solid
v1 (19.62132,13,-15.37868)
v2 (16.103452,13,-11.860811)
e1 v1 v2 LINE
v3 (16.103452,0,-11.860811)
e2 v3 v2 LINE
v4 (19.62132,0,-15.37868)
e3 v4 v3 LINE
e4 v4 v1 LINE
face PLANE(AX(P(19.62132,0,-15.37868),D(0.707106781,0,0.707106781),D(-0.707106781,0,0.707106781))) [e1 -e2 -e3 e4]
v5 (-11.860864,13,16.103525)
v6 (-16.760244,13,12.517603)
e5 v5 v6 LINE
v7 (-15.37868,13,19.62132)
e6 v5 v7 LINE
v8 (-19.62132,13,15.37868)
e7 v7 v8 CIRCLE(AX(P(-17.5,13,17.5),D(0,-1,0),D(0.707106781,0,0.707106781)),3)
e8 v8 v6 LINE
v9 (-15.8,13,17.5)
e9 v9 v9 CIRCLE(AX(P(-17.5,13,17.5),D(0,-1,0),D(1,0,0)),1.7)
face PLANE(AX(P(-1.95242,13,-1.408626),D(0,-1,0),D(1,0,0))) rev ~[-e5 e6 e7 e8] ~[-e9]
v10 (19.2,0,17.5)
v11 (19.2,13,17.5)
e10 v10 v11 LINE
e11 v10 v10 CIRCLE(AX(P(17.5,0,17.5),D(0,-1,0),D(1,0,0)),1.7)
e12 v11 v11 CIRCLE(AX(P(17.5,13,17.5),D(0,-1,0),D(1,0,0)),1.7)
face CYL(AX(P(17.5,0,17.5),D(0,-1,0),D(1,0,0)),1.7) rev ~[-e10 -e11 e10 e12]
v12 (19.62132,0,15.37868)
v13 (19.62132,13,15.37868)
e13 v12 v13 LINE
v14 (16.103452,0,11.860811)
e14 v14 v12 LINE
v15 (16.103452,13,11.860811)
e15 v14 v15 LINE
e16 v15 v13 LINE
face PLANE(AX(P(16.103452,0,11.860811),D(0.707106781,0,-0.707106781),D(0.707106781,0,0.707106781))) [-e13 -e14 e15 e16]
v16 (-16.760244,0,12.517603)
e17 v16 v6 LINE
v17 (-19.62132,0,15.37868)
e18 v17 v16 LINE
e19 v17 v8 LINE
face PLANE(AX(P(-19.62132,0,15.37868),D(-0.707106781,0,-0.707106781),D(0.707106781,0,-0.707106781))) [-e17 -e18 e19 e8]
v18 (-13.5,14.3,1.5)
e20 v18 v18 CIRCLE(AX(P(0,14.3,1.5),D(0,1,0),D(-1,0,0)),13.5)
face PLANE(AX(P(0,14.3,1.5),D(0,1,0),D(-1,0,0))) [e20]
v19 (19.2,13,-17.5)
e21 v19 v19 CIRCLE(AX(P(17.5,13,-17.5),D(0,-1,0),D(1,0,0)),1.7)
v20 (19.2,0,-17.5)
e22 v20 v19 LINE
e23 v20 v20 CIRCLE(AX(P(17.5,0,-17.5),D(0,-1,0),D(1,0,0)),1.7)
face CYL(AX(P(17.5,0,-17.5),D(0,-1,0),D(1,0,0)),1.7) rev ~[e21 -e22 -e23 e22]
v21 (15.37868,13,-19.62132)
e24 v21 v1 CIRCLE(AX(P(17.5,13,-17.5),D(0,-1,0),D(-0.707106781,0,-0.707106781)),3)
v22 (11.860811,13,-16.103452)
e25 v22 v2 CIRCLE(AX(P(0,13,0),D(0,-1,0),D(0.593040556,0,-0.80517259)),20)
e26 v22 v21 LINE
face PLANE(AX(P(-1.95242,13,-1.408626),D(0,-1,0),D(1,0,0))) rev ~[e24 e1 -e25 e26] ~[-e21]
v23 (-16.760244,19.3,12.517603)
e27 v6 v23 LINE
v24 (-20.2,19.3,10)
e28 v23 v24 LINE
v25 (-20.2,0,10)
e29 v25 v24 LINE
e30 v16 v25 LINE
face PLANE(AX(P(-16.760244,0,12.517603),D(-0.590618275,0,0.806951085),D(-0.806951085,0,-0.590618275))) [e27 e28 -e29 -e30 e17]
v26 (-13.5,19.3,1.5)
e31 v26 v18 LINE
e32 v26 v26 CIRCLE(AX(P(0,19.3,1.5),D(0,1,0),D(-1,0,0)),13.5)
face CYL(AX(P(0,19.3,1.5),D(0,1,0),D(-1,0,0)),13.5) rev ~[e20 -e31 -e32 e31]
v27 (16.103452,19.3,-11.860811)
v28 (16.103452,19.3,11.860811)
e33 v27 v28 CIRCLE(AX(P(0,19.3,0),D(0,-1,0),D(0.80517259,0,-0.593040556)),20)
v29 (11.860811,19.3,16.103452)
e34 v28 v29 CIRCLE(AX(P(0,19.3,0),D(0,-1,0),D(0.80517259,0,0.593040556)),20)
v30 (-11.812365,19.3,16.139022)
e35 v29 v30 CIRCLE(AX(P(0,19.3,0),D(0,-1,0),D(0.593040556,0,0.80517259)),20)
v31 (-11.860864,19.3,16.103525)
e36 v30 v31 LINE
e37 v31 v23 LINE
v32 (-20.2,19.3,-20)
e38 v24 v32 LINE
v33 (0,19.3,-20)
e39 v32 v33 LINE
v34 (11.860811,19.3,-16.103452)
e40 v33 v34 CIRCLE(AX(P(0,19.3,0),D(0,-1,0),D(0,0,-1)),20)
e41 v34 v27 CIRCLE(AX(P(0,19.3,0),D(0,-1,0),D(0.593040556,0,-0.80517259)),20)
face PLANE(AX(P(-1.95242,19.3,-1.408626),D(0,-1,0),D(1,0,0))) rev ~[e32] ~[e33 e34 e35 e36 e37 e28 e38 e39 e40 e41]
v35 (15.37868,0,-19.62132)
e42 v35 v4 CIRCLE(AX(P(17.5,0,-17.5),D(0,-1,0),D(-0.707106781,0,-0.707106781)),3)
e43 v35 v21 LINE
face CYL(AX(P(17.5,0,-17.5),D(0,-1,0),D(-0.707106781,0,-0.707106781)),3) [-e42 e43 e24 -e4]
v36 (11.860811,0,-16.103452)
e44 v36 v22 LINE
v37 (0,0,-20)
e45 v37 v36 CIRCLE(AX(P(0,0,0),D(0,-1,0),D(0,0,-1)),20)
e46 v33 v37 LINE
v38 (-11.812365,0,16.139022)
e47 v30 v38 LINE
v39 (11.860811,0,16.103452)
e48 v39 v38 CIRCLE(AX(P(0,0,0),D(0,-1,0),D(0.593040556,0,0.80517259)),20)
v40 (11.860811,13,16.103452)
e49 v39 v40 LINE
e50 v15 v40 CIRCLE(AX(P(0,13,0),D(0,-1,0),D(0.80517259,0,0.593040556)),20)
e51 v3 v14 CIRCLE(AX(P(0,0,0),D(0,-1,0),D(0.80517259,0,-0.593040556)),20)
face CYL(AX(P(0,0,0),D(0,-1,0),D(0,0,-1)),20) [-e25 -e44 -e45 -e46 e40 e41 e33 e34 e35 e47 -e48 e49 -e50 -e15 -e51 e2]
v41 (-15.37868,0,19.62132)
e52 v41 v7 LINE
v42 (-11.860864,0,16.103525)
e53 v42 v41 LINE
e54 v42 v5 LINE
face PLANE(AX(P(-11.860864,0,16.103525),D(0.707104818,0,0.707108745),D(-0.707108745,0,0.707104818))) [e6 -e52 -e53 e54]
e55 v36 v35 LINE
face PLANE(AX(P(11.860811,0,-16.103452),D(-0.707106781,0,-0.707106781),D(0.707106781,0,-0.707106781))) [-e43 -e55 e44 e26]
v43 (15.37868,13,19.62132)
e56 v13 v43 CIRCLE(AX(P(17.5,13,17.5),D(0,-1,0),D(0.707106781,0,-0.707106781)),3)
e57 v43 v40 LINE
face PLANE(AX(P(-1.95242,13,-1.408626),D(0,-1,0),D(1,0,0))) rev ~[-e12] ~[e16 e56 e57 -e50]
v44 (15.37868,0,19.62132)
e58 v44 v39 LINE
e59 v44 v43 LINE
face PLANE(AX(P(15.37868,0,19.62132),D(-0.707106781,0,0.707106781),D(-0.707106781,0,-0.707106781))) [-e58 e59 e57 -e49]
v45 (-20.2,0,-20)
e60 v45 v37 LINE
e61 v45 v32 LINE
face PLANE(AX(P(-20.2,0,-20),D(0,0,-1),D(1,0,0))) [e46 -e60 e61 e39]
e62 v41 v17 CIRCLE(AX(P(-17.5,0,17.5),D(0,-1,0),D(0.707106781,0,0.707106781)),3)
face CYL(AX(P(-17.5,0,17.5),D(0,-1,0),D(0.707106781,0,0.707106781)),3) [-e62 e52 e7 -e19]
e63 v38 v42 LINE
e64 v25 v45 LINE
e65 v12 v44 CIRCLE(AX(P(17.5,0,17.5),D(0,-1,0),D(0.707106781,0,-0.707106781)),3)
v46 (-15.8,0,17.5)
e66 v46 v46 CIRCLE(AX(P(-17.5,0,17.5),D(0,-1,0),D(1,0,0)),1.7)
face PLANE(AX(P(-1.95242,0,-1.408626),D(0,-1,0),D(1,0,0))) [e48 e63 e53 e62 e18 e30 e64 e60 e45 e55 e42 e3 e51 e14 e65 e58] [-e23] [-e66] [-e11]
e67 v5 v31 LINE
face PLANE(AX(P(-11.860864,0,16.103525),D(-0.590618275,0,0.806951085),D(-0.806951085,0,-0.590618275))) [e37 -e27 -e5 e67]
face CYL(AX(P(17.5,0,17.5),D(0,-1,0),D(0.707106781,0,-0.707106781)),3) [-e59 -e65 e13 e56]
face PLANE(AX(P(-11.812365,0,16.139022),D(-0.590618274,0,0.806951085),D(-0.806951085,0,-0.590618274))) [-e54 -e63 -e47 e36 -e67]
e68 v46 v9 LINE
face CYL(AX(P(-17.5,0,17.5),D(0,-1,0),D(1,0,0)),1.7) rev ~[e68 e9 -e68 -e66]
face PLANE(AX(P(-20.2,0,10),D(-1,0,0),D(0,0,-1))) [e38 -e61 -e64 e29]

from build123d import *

# Parameters (mm, degrees)
F0_R     = 1.7
F1_DEPTH = 13
F2_DEPTH = 19.3
F3_R     = 13.5
F4_DEPTH = 5


# Not quite as in the source:
# - ends of sketch curves that miss each other by under 0.0002 mm in the source are joined


with BuildPart() as f1:
    # F0 (on Front) → F1 (new body)
    with BuildSketch(Plane.XZ):
        with BuildLine():
            Line((-20.2, -20), (0, -20))
            ThreePointArc((0, -20), (6.2422337367, -19.0009083461), (11.8608111105, -16.1034517977))
            ThreePointArc((11.8608111105, -16.1034517977), (14.1421356237, -14.1421356237), (16.1034517977, -11.8608111105))
            ThreePointArc((16.1034517977, -11.8608111105), (20, 0), (16.1034517977, 11.8608111105))
            ThreePointArc((16.1034517977, 11.8608111105), (14.1421356237, 14.1421356237), (11.8608111105, 16.1034517977))
            ThreePointArc((11.8608111105, 16.1034517977), (0.0300507716, 19.9999774238), (-11.8123654956, 16.1390216989))
            Line((-11.8123654956, 16.1390216989), (-11.8608644463, 16.1035246693))
            Line((-11.8608644463, 16.1035246693), (-16.7602440212, 12.517603334))
            Line((-16.7602440212, 12.517603334), (-20.2, 10))
            Line((-20.2, 10), (-20.2, -20))
        make_face()
        with BuildLine():
            ThreePointArc((16.1034517977, -11.8608111105), (14.1421356237, -14.1421356237), (11.8608111105, -16.1034517977))
            Line((11.8608111105, -16.1034517977), (15.3786796564, -19.6213203436))
            ThreePointArc((15.3786796564, -19.6213203436), (19.6213203436, -19.6213203436), (19.6213203436, -15.3786796564))
            Line((19.6213203436, -15.3786796564), (16.1034517977, -11.8608111105))
        make_face()
        with Locations((17.5, -17.5)):
            Circle(F0_R, mode=Mode.SUBTRACT)
        with BuildLine():
            ThreePointArc((11.8608111105, 16.1034517977), (14.1421356237, 14.1421356237), (16.1034517977, 11.8608111105))
            Line((16.1034517977, 11.8608111105), (19.6213203436, 15.3786796564))
            ThreePointArc((19.6213203436, 15.3786796564), (19.6213203436, 19.6213203436), (15.3786796564, 19.6213203436))
            Line((15.3786796564, 19.6213203436), (11.8608111105, 16.1034517977))
        make_face()
        with Locations((17.5, 17.5)):
            Circle(F0_R, mode=Mode.SUBTRACT)
        with BuildLine():
            Line((-19.6213203436, 15.3786796564), (-16.7602440212, 12.517603334))
            Line((-16.7602440212, 12.517603334), (-11.8608644463, 16.1035246693))
            Line((-11.8608644463, 16.1035246693), (-15.3786796564, 19.6213203436))
            ThreePointArc((-15.3786796564, 19.6213203436), (-19.6213203436, 19.6213203436), (-19.6213203436, 15.3786796564))
        make_face()
        with Locations((-17.5, 17.5)):
            Circle(F0_R, mode=Mode.SUBTRACT)
    extrude(amount=-F1_DEPTH)

    # F0 (on Front) → F2 (join)
    with BuildSketch(Plane.XZ):
        with BuildLine():
            Line((-20.2, -20), (0, -20))
            ThreePointArc((0, -20), (6.2422337367, -19.0009083461), (11.8608111105, -16.1034517977))
            ThreePointArc((11.8608111105, -16.1034517977), (14.1421356237, -14.1421356237), (16.1034517977, -11.8608111105))
            ThreePointArc((16.1034517977, -11.8608111105), (20, 0), (16.1034517977, 11.8608111105))
            ThreePointArc((16.1034517977, 11.8608111105), (14.1421356237, 14.1421356237), (11.8608111105, 16.1034517977))
            ThreePointArc((11.8608111105, 16.1034517977), (0.0300507716, 19.9999774238), (-11.8123654956, 16.1390216989))
            Line((-11.8123654956, 16.1390216989), (-11.8608644463, 16.1035246693))
            Line((-11.8608644463, 16.1035246693), (-16.7602440212, 12.517603334))
            Line((-16.7602440212, 12.517603334), (-20.2, 10))
            Line((-20.2, 10), (-20.2, -20))
        make_face()
    extrude(amount=-F2_DEPTH)

    # F3 (on face) → F4 (cut)
    with BuildSketch(Plane(origin=(0, 19.3, 0), x_dir=(-1, 0, 0), z_dir=(0, 1, 0))):
        with Locations((0, 1.5)):
            Circle(F3_R)
    extrude(amount=-F4_DEPTH, mode=Mode.SUBTRACT)


solid = f1.part
